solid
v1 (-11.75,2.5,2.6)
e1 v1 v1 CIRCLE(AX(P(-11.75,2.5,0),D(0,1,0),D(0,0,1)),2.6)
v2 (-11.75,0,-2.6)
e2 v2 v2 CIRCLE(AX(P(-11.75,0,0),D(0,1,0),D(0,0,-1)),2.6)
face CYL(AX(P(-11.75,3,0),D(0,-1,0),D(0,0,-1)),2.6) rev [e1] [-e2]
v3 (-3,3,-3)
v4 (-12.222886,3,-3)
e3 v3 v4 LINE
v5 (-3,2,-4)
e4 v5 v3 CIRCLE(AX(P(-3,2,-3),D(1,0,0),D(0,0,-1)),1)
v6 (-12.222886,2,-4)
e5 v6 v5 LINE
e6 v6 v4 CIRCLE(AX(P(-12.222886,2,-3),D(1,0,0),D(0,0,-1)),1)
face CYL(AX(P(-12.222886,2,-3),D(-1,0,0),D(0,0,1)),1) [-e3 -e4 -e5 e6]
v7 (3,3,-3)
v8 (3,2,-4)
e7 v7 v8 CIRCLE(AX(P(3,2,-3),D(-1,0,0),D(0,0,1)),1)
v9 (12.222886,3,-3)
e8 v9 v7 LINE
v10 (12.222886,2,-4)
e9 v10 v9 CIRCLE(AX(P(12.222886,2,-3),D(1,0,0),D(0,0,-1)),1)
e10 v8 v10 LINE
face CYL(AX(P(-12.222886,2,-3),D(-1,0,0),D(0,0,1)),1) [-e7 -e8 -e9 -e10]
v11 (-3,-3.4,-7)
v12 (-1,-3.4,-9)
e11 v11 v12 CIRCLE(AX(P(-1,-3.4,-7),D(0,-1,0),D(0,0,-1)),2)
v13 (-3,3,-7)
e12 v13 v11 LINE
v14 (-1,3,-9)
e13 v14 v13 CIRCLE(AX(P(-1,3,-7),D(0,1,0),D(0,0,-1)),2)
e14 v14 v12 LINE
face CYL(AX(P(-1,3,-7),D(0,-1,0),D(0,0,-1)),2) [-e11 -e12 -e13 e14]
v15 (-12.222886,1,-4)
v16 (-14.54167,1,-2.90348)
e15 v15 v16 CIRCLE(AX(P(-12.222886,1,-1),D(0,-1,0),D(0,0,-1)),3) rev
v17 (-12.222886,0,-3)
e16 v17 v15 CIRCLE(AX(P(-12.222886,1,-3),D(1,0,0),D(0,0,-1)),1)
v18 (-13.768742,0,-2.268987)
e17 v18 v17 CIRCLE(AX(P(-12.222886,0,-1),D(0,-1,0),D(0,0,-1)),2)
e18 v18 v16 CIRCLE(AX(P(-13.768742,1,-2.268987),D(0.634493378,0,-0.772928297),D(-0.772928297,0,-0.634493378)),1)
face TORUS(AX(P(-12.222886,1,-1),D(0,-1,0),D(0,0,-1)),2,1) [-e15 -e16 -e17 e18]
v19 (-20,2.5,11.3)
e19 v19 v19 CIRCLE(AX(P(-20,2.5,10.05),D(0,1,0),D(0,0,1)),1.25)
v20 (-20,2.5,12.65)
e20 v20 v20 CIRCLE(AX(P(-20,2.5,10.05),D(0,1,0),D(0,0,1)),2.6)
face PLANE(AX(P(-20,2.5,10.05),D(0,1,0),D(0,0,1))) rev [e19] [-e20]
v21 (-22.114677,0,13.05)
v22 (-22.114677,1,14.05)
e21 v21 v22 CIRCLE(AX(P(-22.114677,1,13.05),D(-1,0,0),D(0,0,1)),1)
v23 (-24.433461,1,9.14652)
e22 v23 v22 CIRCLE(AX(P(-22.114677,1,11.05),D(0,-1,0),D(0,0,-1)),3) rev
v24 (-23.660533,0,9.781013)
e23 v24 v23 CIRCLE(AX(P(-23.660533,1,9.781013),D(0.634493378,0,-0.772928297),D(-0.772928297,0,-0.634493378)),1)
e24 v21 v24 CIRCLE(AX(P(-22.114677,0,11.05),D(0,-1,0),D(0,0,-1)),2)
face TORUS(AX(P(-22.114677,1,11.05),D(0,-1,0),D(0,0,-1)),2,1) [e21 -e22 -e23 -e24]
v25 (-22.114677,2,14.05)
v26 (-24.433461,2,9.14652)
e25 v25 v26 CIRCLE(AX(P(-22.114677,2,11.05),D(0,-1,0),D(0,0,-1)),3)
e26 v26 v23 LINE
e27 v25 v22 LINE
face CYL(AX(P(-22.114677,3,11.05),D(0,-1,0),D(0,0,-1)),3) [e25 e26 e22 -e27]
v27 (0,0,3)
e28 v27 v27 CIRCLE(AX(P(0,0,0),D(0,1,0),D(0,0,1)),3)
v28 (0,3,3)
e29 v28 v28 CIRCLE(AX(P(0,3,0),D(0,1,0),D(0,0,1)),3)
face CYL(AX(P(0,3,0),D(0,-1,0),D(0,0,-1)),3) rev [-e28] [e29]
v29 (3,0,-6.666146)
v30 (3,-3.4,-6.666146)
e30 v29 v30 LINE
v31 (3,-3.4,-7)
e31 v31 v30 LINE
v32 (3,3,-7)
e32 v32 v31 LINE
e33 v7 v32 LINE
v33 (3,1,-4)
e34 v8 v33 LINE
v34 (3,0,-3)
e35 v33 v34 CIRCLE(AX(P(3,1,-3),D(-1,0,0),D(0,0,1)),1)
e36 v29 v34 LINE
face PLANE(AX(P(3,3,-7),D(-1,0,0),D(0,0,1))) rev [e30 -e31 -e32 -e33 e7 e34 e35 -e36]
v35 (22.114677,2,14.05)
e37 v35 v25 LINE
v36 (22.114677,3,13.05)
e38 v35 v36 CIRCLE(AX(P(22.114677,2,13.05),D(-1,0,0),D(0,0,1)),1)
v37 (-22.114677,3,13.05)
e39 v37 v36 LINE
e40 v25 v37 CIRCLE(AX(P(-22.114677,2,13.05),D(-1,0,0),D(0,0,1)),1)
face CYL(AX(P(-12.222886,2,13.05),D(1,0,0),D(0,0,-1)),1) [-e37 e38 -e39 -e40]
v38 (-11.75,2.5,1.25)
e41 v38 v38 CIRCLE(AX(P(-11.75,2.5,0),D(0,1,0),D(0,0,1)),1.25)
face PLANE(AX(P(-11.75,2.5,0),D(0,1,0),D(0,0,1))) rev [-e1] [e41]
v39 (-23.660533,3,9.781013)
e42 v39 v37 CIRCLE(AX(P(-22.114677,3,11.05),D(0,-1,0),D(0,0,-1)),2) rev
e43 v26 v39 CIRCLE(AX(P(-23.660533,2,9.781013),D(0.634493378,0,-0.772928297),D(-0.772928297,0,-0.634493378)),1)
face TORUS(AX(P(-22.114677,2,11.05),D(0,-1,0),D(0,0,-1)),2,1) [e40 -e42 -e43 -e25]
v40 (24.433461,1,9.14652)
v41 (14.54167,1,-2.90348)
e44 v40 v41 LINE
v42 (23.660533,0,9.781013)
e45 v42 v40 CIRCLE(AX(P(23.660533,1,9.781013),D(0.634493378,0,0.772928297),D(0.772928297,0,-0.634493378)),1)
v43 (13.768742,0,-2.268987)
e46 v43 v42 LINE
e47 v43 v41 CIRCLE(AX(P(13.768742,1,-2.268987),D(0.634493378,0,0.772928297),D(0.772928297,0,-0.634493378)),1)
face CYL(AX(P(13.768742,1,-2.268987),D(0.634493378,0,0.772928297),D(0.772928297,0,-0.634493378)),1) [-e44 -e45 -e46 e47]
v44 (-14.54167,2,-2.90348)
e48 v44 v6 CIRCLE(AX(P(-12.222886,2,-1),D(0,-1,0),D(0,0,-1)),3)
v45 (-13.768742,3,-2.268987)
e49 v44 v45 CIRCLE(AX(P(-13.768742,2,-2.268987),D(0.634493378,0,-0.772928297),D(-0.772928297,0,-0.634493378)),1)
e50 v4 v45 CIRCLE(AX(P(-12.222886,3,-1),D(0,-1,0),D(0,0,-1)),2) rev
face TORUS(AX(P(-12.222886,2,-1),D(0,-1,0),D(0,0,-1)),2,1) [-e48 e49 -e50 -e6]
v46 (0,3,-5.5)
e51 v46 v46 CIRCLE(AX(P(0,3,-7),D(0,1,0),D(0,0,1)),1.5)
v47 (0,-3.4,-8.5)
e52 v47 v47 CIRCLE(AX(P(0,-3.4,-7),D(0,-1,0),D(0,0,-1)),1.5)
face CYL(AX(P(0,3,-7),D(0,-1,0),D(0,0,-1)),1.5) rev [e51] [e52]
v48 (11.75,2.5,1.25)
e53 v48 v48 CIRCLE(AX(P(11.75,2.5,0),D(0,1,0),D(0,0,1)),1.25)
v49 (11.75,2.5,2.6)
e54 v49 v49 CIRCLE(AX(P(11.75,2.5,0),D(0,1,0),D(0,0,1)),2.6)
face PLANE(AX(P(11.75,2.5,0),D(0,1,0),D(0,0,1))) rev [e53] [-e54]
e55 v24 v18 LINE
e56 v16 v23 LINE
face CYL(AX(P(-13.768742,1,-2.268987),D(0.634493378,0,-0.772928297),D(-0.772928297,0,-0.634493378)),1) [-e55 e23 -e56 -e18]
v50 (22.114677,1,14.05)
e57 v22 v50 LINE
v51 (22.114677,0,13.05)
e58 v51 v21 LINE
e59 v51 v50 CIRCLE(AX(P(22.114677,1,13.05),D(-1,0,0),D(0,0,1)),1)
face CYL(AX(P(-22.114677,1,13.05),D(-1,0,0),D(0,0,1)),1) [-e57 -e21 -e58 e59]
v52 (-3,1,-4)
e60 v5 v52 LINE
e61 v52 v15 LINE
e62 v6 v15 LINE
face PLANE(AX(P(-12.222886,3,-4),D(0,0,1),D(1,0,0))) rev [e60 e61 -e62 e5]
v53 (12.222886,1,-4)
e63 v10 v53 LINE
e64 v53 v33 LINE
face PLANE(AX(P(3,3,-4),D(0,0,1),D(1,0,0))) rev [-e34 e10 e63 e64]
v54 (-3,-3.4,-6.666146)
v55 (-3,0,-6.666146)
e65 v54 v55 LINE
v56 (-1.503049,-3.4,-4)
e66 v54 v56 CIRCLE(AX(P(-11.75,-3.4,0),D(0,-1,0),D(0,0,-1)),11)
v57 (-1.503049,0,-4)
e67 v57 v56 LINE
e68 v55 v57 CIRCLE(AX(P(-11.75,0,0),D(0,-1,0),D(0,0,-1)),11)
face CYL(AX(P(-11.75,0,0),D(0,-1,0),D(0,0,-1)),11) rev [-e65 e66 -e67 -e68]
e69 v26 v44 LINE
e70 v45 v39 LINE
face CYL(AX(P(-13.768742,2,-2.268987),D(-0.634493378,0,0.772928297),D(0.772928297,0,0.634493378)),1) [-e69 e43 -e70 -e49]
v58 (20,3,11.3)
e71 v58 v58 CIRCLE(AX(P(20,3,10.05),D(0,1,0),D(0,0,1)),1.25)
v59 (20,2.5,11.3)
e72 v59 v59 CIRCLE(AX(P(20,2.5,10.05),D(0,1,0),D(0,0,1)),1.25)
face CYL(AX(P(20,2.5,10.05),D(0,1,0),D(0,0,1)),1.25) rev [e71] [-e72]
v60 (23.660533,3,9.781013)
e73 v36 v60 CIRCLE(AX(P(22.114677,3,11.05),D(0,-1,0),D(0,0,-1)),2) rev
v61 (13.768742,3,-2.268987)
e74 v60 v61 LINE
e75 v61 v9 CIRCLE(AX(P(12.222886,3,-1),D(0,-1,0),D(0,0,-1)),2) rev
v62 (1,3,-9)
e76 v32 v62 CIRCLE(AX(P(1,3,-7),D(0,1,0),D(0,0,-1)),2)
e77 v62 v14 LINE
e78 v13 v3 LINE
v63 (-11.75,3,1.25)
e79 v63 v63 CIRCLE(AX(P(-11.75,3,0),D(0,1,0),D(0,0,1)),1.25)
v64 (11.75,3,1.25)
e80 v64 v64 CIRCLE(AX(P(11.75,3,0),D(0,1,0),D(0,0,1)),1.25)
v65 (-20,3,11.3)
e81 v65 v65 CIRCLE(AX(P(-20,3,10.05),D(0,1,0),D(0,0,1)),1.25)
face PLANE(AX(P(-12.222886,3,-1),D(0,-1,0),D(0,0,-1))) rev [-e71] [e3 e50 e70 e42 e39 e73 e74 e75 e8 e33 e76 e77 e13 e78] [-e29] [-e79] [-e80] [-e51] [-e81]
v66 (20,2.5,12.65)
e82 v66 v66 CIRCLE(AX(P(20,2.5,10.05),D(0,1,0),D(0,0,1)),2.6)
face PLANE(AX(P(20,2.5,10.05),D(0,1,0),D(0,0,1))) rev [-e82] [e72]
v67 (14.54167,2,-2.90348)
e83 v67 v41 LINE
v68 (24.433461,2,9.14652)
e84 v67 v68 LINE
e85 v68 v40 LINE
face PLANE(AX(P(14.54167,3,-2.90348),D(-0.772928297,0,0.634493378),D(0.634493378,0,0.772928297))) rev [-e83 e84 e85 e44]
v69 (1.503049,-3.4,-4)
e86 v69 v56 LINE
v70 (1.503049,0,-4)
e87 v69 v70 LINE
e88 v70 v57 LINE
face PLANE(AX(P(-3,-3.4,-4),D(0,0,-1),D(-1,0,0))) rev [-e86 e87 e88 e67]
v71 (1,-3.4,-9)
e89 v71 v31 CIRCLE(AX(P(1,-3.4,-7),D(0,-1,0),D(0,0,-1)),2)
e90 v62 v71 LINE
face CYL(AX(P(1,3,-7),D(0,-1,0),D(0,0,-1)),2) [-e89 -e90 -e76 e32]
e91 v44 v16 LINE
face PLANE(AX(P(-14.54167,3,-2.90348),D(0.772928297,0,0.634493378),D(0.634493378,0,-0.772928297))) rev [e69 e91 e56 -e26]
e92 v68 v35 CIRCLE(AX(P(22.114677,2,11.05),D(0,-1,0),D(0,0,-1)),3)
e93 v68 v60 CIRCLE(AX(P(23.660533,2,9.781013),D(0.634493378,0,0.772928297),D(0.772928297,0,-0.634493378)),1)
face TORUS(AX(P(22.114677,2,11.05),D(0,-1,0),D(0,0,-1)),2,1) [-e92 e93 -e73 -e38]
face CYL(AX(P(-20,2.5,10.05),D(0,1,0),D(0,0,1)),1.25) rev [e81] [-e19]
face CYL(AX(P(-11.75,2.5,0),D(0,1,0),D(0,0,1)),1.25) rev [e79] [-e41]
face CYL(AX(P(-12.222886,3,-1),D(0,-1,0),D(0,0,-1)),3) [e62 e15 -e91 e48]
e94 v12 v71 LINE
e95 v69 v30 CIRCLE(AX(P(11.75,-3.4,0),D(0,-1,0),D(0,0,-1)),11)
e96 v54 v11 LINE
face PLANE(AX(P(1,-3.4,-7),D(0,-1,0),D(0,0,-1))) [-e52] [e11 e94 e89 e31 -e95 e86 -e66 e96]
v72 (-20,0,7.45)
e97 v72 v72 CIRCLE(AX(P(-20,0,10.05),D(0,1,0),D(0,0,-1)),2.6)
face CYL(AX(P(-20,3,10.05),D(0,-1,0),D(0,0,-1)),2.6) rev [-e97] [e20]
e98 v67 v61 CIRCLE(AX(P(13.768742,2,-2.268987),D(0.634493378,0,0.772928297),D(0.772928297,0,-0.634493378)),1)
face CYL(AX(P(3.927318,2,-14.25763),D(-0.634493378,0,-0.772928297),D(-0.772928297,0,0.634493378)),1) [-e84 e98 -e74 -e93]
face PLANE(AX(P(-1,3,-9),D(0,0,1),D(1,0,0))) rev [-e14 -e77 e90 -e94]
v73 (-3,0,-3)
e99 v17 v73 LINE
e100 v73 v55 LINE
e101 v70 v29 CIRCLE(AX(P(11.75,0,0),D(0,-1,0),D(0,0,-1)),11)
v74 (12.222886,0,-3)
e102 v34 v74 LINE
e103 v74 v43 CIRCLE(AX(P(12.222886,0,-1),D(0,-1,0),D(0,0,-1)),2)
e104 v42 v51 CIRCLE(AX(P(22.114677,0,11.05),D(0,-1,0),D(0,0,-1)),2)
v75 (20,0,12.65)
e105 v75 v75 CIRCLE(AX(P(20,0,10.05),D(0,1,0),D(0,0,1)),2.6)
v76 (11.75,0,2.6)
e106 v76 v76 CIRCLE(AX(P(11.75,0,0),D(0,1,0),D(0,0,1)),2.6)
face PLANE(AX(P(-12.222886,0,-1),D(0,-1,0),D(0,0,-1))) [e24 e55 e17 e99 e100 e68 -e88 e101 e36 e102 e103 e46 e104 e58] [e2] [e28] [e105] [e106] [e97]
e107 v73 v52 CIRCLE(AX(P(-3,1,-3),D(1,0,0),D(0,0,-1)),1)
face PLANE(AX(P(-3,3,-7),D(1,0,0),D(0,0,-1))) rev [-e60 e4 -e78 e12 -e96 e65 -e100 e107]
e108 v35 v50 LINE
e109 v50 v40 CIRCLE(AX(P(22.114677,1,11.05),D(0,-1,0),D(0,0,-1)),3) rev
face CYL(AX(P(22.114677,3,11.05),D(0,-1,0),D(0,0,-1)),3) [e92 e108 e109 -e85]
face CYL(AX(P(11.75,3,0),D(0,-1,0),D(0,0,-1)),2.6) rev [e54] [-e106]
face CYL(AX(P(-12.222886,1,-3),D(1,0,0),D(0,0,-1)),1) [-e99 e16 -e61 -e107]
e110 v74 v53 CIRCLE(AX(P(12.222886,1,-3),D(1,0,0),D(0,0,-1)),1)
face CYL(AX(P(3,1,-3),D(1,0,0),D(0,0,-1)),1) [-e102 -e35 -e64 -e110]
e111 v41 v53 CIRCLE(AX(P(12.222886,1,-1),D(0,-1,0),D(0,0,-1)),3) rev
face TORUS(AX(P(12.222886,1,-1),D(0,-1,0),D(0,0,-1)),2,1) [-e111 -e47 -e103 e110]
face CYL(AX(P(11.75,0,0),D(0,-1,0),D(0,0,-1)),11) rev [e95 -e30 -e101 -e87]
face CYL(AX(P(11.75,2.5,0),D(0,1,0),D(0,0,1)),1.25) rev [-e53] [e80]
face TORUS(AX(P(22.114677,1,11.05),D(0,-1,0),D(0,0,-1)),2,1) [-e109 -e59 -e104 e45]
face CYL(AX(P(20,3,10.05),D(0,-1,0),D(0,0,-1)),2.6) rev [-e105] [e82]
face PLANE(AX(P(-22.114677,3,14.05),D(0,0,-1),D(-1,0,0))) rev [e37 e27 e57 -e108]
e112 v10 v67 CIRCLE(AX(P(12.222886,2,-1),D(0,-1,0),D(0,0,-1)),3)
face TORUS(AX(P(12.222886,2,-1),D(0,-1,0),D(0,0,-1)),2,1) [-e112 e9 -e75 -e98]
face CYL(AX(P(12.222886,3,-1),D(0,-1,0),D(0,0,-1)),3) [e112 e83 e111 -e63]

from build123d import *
from build123d.topology import SkipClean

# Parameters (mm, degrees)
SKETCH1_R           = 3
SKETCH1_R_2         = 2.6
SKETCH1_R_3         = 1.5
BOSS_EXTRUDE1_DEPTH = 3
BOSS_EXTRUDE3_START = -0.5
SKETCH3_R           = 2.6
SKETCH3_R_2         = 1.25
BOSS_EXTRUDE3_DEPTH = 0.5
BOSS_EXTRUDE4_START = 3.4
SKETCH4_R           = 1.5
BOSS_EXTRUDE4_DEPTH = 3.4
FILLET1_R           = 1
SKETCH5_R           = 11
CUT_EXTRUDE1_DEPTH  = 3.4


with BuildPart() as part:
    # Sketch1 → Boss-Extrude1 (new body)
    with BuildSketch(Plane(origin=(0, 0, 0), x_dir=(1, 0, 0), z_dir=(0, 1, 0))):
        with BuildLine():
            Line((-14.54167044, 2.903480135), (-24.433461485, -9.146519865))
            ThreePointArc((-24.433461485, -9.146519865), (-24.826727515, -12.332489687), (-22.114676593, -14.05))
            Line((-22.114676593, -14.05), (22.114676593, -14.05))
            ThreePointArc((22.114676593, -14.05), (24.826727515, -12.332489687), (24.433461485, -9.146519865))
            Line((24.433461485, -9.146519865), (14.54167044, 2.903480135))
            ThreePointArc((14.54167044, 2.903480135), (13.505375235, 3.712050922), (12.222885548, 4))
            Line((12.222885548, 4), (3, 4))
            Line((3, 4), (3, 7))
            ThreePointArc((3, 7), (2.414213562, 8.414213562), (1, 9))
            Line((1, 9), (-1, 9))
            ThreePointArc((-1, 9), (-2.414213562, 8.414213562), (-3, 7))
            Line((-3, 7), (-3, 4))
            Line((-3, 4), (-12.222885548, 4))
            ThreePointArc((-12.222885548, 4), (-13.505375235, 3.712050922), (-14.54167044, 2.903480135))
        make_face()
        with Locations(Location((0, 0, 0), (0, 0, 270))):
            Circle(SKETCH1_R, mode=Mode.SUBTRACT)
        with Locations(Location((11.75, 0, 0), (0, 0, 270))):
            Circle(SKETCH1_R_2, mode=Mode.SUBTRACT)
        with Locations(Location((20, -10.05, 0), (0, 0, 270))):
            Circle(SKETCH1_R_2, mode=Mode.SUBTRACT)
        with Locations(Location((-20, -10.05, 0), (0, 0, 90))):
            Circle(SKETCH1_R_2, mode=Mode.SUBTRACT)
        with Locations(Location((-11.75, 0, 0), (0, 0, 90))):
            Circle(SKETCH1_R_2, mode=Mode.SUBTRACT)
        with Locations(Location((0, 7, 0), (0, 0, 270))):
            Circle(SKETCH1_R_3, mode=Mode.SUBTRACT)
    extrude(amount=BOSS_EXTRUDE1_DEPTH)

    # Sketch3 → Boss-Extrude3 (add)
    # profile 1 of 4: a face of its own
    with BuildSketch(Plane(origin=(0, 3, 0), x_dir=(1, 0, 0), z_dir=(0, 1, 0)).offset(BOSS_EXTRUDE3_START)):
        with Locations(Location((-11.75, 0, 0), (0, 0, 90))):
            Circle(SKETCH3_R)
        with Locations(Location((-11.75, 0, 0), (0, 0, 270))):
            Circle(SKETCH3_R_2, mode=Mode.SUBTRACT)
    # profile 2 of 4: a face of its own
    with BuildSketch(Plane(origin=(0, 3, 0), x_dir=(1, 0, 0), z_dir=(0, 1, 0)).offset(BOSS_EXTRUDE3_START)):
        with Locations(Location((-20, -10.05, 0), (0, 0, 90))):
            Circle(SKETCH3_R)
        with Locations(Location((-20, -10.05, 0), (0, 0, 270))):
            Circle(SKETCH3_R_2, mode=Mode.SUBTRACT)
    # profile 3 of 4: a face of its own
    with BuildSketch(Plane(origin=(0, 3, 0), x_dir=(1, 0, 0), z_dir=(0, 1, 0)).offset(BOSS_EXTRUDE3_START)):
        with Locations(Location((11.75, 0, 0), (0, 0, 270))):
            Circle(SKETCH3_R)
        with Locations(Location((11.75, 0, 0), (0, 0, 270))):
            Circle(SKETCH3_R_2, mode=Mode.SUBTRACT)
    # profile 4 of 4: a face of its own
    with BuildSketch(Plane(origin=(0, 3, 0), x_dir=(1, 0, 0), z_dir=(0, 1, 0)).offset(BOSS_EXTRUDE3_START)):
        with Locations(Location((20, -10.05, 0), (0, 0, 270))):
            Circle(SKETCH3_R)
        with Locations(Location((20, -10.05, 0), (0, 0, 270))):
            Circle(SKETCH3_R_2, mode=Mode.SUBTRACT)
    extrude(amount=BOSS_EXTRUDE3_DEPTH)

    # Sketch4 → Boss-Extrude4 (add)
    with SkipClean():  # the faces are left unmerged after this step: merging them gives an invalid solid
        with BuildSketch(Plane(origin=(0, 0, 0), x_dir=(-1, 0, 0), z_dir=(0, -1, 0)).offset(BOSS_EXTRUDE4_START)):
            with BuildLine():
                Line((-3, 4), (-3, 7))
                ThreePointArc((-3, 7), (-2.414213562, 8.414213562), (-1, 9))
                Line((-1, 9), (1, 9))
                ThreePointArc((1, 9), (2.414213562, 8.414213562), (3, 7))
                Line((3, 7), (3, 4))
                Line((3, 4), (-3, 4))
            make_face()
            with Locations(Location((0, 7, 0), (0, 0, 90))):
                Circle(SKETCH4_R, mode=Mode.SUBTRACT)
        extrude(amount=-BOSS_EXTRUDE4_DEPTH)

    # Fillet1
    # the kernel refuses this fillet: 1 mm, written as the material it takes off along each edge
    with BuildSketch(Plane(origin=(-22.114676593, 3, 11.05), x_dir=(-0.772928297309301, 0, -0.6344933783882578), z_dir=(0.6344933783882578, 0, -0.772928297309301))) as fillet1_piece_1:
        with BuildLine():
            CenterArc((3 - FILLET1_R, -FILLET1_R), FILLET1_R, 0, 90)
            Line((3, -FILLET1_R), (3, 0))
            Line((3, 0), (3 - FILLET1_R, 0))
        make_face()
    revolve(axis=Axis((-22.114676593, 3, 11.05), (0, 1, 0)), revolution_arc=129.38241941, mode=Mode.SUBTRACT)
    with BuildSketch(Plane(origin=(-3, 0, -4), x_dir=(0, 1, 0), z_dir=(-1, 0, 0)), Plane(origin=(12.222885548, 3, -4), x_dir=(0, 0, 1), z_dir=(-1, 0, 0))) as fillet1_piece_2:
        with BuildLine():
            CenterArc((FILLET1_R, -FILLET1_R), FILLET1_R, 90, 90)
            Line((0, -FILLET1_R), (0, 0))
            Line((0, 0), (FILLET1_R, 0))
        make_face()
    extrude(amount=9.222885548, mode=Mode.SUBTRACT)
    with BuildSketch(Plane(origin=(12.222885548, 0, -4), x_dir=(0, 0, 1), z_dir=(-1, 0, 0)), Plane(origin=(-3, 3, -4), x_dir=(0, -1, 0), z_dir=(-1, 0, 0))) as fillet1_piece_3:
        with BuildLine():
            CenterArc((FILLET1_R, FILLET1_R), FILLET1_R, 180, 90)
            Line((0, FILLET1_R), (0, 0))
            Line((0, 0), (FILLET1_R, 0))
        make_face()
    extrude(amount=9.222885548, mode=Mode.SUBTRACT)
    with BuildSketch(Plane(origin=(12.222885548, 0, -1), x_dir=(0.7729282973093169, 0, -0.6344933783882384), z_dir=(0.6344933783882384, 0, 0.7729282973093169))) as fillet1_piece_4:
        with BuildLine():
            CenterArc((3 - FILLET1_R, FILLET1_R), FILLET1_R, 270, 90)
            Line((3, FILLET1_R), (3, 0))
            Line((3, 0), (3 - FILLET1_R, 0))
        make_face()
    revolve(axis=Axis((12.222885548, 0, -1), (0, 1, 0)), revolution_arc=50.61758059, mode=Mode.SUBTRACT)
    with BuildSketch(Plane(origin=(-22.114676593, 3, 14.05), x_dir=(0, 0, -1), z_dir=(1, 0, 0))) as fillet1_piece_5:
        with BuildLine():
            CenterArc((FILLET1_R, -FILLET1_R), FILLET1_R, 90, 90)
            Line((0, -FILLET1_R), (0, 0))
            Line((0, 0), (FILLET1_R, 0))
        make_face()
    extrude(amount=44.229353186, mode=Mode.SUBTRACT)
    with BuildSketch(Plane(origin=(24.433461485, 0, 9.146519865), x_dir=(-0.7729282973093136, 0, 0.6344933783882426), z_dir=(-0.6344933783882426, 0, -0.7729282973093136)), Plane(origin=(-14.54167044, 3, -2.903480135), x_dir=(0, -1, 0), z_dir=(-0.6344933783882424, 0, 0.7729282973093137))) as fillet1_piece_6:
        with BuildLine():
            CenterArc((FILLET1_R, FILLET1_R), FILLET1_R, 180, 90)
            Line((0, FILLET1_R), (0, 0))
            Line((0, 0), (FILLET1_R, 0))
        make_face()
    extrude(amount=15.590061901, mode=Mode.SUBTRACT)
    with BuildSketch(Plane(origin=(22.114676593, 0, 11.05), x_dir=(0, 0, 1), z_dir=(-1, 0, 0))) as fillet1_piece_7:
        with BuildLine():
            CenterArc((3 - FILLET1_R, FILLET1_R), FILLET1_R, 270, 90)
            Line((3, FILLET1_R), (3, 0))
            Line((3, 0), (3 - FILLET1_R, 0))
        make_face()
    revolve(axis=Axis((22.114676593, 0, 11.05), (0, 1, 0)), revolution_arc=129.38241941, mode=Mode.SUBTRACT)
    with BuildSketch(Plane(origin=(-22.114676593, 0, 14.05), x_dir=(0, 0, -1), z_dir=(1, 0, 0))) as fillet1_piece_8:
        with BuildLine():
            CenterArc((FILLET1_R, FILLET1_R), FILLET1_R, 180, 90)
            Line((0, FILLET1_R), (0, 0))
            Line((0, 0), (FILLET1_R, 0))
        make_face()
    extrude(amount=44.229353186, mode=Mode.SUBTRACT)
    with BuildSketch(Plane(origin=(-22.114676593, 0, 11.05), x_dir=(-0.772928297309301, 0, -0.6344933783882578), z_dir=(0.6344933783882578, 0, -0.772928297309301))) as fillet1_piece_9:
        with BuildLine():
            CenterArc((3 - FILLET1_R, FILLET1_R), FILLET1_R, 270, 90)
            Line((3, FILLET1_R), (3, 0))
            Line((3, 0), (3 - FILLET1_R, 0))
        make_face()
    revolve(axis=Axis((-22.114676593, 0, 11.05), (0, 1, 0)), revolution_arc=129.38241941, mode=Mode.SUBTRACT)
    with BuildSketch(Plane(origin=(-14.54167044, 0, -2.903480135), x_dir=(0, 1, 0), z_dir=(-0.6344933783882424, 0, 0.7729282973093137)), Plane(origin=(24.433461485, 3, 9.146519865), x_dir=(-0.7729282973093136, 0, 0.6344933783882426), z_dir=(-0.6344933783882426, 0, -0.7729282973093136))) as fillet1_piece_10:
        with BuildLine():
            CenterArc((FILLET1_R, -FILLET1_R), FILLET1_R, 90, 90)
            Line((0, -FILLET1_R), (0, 0))
            Line((0, 0), (FILLET1_R, 0))
        make_face()
    extrude(amount=15.590061901, mode=Mode.SUBTRACT)
    with BuildSketch(Plane(origin=(-12.222885548, 0, -1), x_dir=(0, 0, -1), z_dir=(1, 0, 0))) as fillet1_piece_11:
        with BuildLine():
            CenterArc((3 - FILLET1_R, FILLET1_R), FILLET1_R, 270, 90)
            Line((3 - FILLET1_R, 0), (3, 0))
            Line((3, 0), (3, FILLET1_R))
        make_face()
    revolve(axis=Axis((-12.222885548, 0, -1), (0, 1, 0)), revolution_arc=50.61758059, mode=Mode.SUBTRACT)
    with BuildSketch(Plane(origin=(22.114676593, 3, 11.05), x_dir=(0, 0, 1), z_dir=(-1, 0, 0))) as fillet1_piece_12:
        with BuildLine():
            CenterArc((3 - FILLET1_R, -FILLET1_R), FILLET1_R, 0, 90)
            Line((3, -FILLET1_R), (3, 0))
            Line((3, 0), (3 - FILLET1_R, 0))
        make_face()
    revolve(axis=Axis((22.114676593, 3, 11.05), (0, 1, 0)), revolution_arc=129.38241941, mode=Mode.SUBTRACT)
    with BuildSketch(Plane(origin=(12.222885548, 3, -1), x_dir=(0.7729282973093169, 0, -0.6344933783882384), z_dir=(0.6344933783882384, 0, 0.7729282973093169))) as fillet1_piece_13:
        with BuildLine():
            CenterArc((3 - FILLET1_R, -FILLET1_R), FILLET1_R, 0, 90)
            Line((3, -FILLET1_R), (3, 0))
            Line((3, 0), (3 - FILLET1_R, 0))
        make_face()
    revolve(axis=Axis((12.222885548, 3, -1), (0, 1, 0)), revolution_arc=50.61758059, mode=Mode.SUBTRACT)
    with BuildSketch(Plane(origin=(-12.222885548, 3, -1), x_dir=(0, 0, -1), z_dir=(1, 0, 0))) as fillet1_piece_14:
        with BuildLine():
            CenterArc((3 - FILLET1_R, -FILLET1_R), FILLET1_R, 0, 90)
            Line((3 - FILLET1_R, 0), (3, 0))
            Line((3, 0), (3, -FILLET1_R))
        make_face()
    revolve(axis=Axis((-12.222885548, 3, -1), (0, 1, 0)), revolution_arc=50.61758059, mode=Mode.SUBTRACT)

    # Sketch5 → Cut-Extrude1 (cut)
    with BuildSketch(Plane(origin=(0, -3.4, 0), x_dir=(-1, 0, 0), z_dir=(0, -1, 0))):
        with Locations((-11.75, 0)):
            Circle(SKETCH5_R)
        with Locations((11.75, 0)):
            Circle(SKETCH5_R)
    extrude(amount=-CUT_EXTRUDE1_DEPTH, mode=Mode.SUBTRACT)


solid = part.part
